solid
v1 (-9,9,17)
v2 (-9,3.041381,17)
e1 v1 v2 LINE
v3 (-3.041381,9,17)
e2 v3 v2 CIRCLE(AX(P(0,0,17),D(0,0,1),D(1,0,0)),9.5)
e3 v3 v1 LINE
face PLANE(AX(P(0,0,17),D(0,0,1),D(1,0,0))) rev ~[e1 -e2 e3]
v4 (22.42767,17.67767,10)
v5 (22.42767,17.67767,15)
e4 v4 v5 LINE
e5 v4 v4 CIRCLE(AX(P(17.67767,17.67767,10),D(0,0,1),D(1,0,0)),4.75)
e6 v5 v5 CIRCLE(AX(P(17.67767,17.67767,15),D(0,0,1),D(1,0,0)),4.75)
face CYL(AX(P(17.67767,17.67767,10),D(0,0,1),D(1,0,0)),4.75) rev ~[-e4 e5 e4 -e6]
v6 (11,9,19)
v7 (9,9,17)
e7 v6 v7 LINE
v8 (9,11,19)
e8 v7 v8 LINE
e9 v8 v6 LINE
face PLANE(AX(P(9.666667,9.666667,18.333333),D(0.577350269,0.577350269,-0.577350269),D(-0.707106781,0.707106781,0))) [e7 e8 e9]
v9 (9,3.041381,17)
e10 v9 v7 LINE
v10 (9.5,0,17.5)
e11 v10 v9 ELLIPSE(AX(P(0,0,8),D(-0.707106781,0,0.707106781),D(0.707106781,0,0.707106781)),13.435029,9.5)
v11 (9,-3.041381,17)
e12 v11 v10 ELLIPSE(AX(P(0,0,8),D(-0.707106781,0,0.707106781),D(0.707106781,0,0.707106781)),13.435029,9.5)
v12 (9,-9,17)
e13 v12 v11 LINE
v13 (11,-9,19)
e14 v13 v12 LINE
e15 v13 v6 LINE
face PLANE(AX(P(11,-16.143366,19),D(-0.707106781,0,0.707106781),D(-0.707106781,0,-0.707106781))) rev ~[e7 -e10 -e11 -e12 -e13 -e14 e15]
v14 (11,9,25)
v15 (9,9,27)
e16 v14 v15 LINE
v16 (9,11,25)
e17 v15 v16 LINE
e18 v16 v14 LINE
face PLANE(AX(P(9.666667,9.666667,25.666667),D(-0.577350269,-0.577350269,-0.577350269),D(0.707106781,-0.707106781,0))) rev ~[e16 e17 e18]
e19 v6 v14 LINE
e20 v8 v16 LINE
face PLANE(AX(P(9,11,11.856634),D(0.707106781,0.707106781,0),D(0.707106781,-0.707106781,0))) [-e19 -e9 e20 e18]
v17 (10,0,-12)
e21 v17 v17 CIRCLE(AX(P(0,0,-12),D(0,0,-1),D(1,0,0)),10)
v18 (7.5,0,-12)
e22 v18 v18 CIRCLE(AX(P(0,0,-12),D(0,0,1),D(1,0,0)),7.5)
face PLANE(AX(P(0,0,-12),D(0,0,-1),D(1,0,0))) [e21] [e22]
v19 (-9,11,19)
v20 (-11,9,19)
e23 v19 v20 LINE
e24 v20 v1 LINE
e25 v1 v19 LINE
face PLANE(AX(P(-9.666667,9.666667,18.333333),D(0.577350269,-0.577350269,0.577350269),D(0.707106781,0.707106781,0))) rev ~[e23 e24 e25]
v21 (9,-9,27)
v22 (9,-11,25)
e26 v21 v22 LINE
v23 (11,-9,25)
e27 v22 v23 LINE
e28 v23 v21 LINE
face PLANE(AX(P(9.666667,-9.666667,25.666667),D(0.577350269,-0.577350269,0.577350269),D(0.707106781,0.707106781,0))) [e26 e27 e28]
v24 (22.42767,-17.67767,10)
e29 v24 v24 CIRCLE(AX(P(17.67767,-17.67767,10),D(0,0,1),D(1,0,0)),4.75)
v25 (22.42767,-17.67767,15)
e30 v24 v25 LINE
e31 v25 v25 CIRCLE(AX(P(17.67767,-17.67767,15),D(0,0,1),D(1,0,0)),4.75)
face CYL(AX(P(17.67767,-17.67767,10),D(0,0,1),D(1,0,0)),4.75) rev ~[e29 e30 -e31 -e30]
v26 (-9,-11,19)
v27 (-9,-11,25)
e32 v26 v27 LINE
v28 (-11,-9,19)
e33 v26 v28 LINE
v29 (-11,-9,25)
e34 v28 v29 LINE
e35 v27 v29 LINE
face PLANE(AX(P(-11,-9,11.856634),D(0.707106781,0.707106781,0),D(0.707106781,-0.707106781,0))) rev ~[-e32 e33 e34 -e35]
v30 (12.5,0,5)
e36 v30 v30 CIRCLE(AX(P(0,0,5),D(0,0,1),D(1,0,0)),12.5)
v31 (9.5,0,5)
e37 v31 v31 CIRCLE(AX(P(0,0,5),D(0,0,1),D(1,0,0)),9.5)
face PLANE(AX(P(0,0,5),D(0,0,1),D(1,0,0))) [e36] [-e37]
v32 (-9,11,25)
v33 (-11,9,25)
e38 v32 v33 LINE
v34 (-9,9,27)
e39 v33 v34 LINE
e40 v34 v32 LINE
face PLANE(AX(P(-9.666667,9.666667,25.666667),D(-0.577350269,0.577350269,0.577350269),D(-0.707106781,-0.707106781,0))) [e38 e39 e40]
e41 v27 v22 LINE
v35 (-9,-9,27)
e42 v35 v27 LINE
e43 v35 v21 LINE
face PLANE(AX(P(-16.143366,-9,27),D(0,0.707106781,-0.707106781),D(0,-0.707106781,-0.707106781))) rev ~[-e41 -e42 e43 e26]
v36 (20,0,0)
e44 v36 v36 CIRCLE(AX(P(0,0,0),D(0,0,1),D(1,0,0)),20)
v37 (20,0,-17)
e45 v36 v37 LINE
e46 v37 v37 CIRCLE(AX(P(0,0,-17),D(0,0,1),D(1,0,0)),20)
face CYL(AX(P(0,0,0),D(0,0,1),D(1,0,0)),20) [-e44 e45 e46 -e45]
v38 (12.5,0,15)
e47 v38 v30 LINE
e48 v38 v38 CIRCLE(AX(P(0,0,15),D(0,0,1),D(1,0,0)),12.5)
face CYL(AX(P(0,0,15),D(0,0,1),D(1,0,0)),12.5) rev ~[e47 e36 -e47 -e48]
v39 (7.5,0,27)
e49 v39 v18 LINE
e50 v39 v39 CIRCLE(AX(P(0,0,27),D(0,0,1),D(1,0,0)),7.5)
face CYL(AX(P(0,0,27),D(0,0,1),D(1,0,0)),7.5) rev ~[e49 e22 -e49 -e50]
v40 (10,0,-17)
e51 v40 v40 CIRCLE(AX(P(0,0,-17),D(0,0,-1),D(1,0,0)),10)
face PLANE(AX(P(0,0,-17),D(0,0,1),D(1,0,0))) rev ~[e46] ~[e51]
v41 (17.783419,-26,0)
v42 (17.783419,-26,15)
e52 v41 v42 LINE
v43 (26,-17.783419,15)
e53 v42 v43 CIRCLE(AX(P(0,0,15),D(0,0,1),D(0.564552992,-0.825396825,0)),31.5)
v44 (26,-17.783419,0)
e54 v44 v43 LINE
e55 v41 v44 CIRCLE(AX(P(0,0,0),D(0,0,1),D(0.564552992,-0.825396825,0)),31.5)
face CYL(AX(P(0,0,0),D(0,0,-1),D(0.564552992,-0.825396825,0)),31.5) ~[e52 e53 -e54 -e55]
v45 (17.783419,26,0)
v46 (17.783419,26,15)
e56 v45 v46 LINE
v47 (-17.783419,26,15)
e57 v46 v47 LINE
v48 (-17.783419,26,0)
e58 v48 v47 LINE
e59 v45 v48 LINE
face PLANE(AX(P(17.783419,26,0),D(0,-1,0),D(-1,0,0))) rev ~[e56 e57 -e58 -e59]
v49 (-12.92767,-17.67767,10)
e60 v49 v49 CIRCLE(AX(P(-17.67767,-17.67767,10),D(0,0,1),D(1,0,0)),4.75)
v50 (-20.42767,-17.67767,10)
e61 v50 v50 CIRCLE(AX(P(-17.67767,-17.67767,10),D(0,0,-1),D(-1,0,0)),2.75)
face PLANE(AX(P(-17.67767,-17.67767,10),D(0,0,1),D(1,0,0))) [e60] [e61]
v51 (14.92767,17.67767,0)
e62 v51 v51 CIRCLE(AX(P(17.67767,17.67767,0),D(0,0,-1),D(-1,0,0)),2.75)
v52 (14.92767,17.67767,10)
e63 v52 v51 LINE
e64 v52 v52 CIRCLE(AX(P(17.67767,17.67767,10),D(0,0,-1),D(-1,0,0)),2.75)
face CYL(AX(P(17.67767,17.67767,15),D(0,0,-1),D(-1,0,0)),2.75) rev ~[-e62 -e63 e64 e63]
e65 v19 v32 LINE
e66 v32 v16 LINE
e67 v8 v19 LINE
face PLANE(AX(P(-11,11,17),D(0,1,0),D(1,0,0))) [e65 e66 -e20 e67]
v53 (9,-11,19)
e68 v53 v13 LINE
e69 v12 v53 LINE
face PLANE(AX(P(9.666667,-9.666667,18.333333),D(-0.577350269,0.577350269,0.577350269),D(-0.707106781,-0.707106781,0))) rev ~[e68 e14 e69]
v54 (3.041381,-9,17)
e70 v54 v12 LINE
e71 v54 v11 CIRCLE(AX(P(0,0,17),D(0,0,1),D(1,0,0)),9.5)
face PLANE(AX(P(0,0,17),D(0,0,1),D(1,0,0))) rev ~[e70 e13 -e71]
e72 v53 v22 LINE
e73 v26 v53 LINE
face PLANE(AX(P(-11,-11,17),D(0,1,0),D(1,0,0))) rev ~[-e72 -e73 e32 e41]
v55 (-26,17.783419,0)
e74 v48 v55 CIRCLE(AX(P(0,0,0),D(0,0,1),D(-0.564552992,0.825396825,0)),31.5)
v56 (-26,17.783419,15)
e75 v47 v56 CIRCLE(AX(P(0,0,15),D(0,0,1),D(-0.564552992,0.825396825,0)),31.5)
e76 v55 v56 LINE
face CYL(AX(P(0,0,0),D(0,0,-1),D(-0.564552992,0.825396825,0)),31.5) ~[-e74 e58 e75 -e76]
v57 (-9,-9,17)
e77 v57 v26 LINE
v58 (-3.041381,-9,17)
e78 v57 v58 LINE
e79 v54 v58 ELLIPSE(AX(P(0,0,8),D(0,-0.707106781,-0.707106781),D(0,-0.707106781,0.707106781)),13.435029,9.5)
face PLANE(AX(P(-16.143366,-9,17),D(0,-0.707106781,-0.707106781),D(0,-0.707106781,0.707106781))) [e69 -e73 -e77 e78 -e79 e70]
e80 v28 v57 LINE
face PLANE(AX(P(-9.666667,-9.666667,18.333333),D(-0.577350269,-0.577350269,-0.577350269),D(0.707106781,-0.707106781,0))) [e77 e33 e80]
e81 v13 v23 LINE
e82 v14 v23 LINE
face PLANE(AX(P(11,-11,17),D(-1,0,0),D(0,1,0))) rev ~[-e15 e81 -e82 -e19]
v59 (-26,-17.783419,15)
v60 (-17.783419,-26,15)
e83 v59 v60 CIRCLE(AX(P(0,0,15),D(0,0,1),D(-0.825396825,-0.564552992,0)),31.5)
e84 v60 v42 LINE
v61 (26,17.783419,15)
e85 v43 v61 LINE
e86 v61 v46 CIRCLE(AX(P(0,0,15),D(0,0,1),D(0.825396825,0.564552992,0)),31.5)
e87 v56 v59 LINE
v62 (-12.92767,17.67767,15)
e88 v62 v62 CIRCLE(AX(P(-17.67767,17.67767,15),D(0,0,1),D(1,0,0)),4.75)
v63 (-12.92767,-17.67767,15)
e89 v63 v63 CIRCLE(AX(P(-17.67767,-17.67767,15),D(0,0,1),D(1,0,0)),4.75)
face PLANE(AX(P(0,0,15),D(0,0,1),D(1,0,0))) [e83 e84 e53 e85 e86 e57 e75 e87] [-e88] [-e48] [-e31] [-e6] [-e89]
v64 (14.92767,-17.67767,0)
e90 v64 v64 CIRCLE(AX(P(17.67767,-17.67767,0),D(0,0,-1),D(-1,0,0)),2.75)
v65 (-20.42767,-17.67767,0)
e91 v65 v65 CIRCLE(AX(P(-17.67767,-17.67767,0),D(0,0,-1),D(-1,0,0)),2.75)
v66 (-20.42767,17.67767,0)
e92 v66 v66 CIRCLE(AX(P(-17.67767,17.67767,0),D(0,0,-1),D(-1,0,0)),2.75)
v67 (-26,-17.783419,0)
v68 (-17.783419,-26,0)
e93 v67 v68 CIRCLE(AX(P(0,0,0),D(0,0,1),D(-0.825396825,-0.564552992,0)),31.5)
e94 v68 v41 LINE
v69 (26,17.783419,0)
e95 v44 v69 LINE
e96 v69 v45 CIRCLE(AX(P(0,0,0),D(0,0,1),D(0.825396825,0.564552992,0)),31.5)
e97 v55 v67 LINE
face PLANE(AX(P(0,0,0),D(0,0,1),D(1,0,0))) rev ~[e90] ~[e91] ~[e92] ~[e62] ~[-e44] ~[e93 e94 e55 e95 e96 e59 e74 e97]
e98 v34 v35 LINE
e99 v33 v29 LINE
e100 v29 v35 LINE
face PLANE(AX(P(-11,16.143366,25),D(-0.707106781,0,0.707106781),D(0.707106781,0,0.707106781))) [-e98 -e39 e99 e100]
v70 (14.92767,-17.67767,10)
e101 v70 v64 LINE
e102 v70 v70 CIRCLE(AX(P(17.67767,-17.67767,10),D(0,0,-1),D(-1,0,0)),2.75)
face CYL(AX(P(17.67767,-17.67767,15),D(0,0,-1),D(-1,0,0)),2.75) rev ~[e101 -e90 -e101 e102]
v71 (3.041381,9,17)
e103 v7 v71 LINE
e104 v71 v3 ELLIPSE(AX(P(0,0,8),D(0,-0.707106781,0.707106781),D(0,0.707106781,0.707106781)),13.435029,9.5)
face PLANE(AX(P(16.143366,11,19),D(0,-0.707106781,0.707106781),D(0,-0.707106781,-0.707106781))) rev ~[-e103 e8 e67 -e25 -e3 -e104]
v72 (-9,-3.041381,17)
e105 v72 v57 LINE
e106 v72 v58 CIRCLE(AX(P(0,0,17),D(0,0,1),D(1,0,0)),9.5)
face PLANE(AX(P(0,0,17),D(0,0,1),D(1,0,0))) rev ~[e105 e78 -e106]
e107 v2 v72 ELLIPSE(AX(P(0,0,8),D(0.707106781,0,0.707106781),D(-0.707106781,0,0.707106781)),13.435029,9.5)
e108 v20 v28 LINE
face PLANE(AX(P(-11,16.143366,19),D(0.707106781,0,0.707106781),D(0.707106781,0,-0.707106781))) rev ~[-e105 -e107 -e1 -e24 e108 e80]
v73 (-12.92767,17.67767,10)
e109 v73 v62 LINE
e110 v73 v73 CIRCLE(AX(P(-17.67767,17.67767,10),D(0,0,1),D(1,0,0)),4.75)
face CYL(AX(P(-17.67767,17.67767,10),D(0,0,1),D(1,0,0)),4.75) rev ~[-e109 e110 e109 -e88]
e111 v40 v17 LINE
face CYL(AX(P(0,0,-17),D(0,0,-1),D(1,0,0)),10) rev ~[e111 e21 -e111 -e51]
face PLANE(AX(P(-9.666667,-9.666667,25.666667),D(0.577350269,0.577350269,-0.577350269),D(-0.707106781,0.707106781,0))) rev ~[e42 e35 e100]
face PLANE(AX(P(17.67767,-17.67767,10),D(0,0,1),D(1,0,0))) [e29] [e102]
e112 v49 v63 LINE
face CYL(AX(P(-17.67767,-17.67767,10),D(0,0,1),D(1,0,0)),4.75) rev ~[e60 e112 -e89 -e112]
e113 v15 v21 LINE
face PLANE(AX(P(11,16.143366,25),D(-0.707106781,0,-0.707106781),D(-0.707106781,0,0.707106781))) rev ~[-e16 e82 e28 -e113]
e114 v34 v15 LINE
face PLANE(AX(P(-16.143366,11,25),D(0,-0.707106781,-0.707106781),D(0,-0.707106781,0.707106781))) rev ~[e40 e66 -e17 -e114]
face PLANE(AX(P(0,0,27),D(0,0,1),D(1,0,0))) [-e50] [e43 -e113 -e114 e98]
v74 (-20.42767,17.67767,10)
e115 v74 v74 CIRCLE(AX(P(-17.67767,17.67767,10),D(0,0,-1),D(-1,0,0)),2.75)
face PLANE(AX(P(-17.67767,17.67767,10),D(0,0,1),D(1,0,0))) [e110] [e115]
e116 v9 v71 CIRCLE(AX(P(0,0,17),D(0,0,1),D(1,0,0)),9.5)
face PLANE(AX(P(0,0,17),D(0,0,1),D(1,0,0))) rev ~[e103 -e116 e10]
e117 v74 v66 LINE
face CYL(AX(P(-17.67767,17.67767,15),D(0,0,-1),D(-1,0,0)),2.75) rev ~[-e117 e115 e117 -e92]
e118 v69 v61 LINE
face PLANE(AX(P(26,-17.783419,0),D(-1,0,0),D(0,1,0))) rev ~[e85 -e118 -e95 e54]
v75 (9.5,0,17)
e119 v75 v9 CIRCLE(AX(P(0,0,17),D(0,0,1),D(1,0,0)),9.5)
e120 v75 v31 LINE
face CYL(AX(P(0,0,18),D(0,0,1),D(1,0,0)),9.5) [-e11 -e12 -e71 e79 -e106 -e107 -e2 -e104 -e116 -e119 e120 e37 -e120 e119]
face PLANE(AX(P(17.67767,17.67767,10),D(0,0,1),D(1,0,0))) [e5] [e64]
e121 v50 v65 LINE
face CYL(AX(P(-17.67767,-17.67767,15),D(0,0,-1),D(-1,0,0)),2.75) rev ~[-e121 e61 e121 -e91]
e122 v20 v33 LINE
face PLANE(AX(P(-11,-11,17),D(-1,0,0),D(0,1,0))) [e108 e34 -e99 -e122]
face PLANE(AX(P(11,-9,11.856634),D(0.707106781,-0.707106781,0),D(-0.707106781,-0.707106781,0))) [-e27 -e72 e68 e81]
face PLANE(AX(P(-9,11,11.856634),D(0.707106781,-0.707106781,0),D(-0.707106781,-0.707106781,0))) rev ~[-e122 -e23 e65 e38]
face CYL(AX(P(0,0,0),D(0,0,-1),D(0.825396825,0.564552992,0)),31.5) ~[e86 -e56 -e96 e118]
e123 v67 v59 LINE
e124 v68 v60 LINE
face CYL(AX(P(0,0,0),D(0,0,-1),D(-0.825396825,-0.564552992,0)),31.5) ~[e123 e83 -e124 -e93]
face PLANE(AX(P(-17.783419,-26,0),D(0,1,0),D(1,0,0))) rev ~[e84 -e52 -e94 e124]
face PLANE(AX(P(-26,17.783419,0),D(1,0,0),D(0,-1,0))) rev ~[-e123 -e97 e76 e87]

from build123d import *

# Parameters (mm, degrees)
F0_R            = 20
F1_DEPTH        = 17
F3_DEPTH        = 15
F4_R            = 12.5
F4_R_2          = 9.5
F5_DEPTH        = 10
F6_R            = 9.5
F7_DEPTH        = 2
F8_W            = 22
F8_H            = 22
F9_DEPTH        = 10
F10_T1_DEPTH    = 2.5403411844
F10_T3_DEPTH    = 2.5403411844
F10_T5_DEPTH    = 2.5403411844
F10_T7_DEPTH    = 2.5403411844
F10_T9_DEPTH    = 2.5403411844
F10_T11_DEPTH   = 2.5403411844
F10_T13_DEPTH   = 2.5403411844
F10_T15_DEPTH   = 2.5403411844
F10_T17_DEPTH   = 32.2867319519
F10_T19_DEPTH   = 32.2867319519
F10_T24_DEPTH   = 20.2867319519
F10_T29_DEPTH   = 20.2867319519
F10_T34_DEPTH   = 20.2867319519
F10_T39_DEPTH   = 20.2867319519
F10_T44_DEPTH   = 32.2867319519
F10_S45_R       = 9.5
F10_T46_DEPTH   = 18
F10_T50_DEPTH   = 32.2867319519
F10_S51_R       = 9.5
F10_T52_DEPTH   = 18
F10_T56_DEPTH   = 32.2867319519
F10_S57_R       = 9.5
F10_T58_DEPTH   = 18
F10_T62_DEPTH   = 32.2867319519
F10_S63_R       = 9.5
F10_T64_DEPTH   = 18
F11_R           = 10
F12_DEPTH       = 5
F13_R           = 7.5
F14_DEPTH       = 44.001
F16_D           = 5.5
F16_CBORE_D     = 9.5
F16_CBORE_DEPTH = 5


# Not quite as in the source:
# - a fillet or chamfer that OpenCascade refuses, or shapes differently, is made with other operations: its cross-section is extruded or revolved along the edge and cut away or added


with BuildPart() as f1:
    # F0 (on Top) → F1 (new body)
    with BuildSketch(Plane.XY):
        Circle(F0_R)
    extrude(amount=-F1_DEPTH)

    # F2 (on Top) → F3 (join)
    with BuildSketch(Plane.XY):
        with BuildLine():
            Line((17.7834192438, 26), (-17.7834192438, 26))
            ThreePointArc((-17.7834192438, 26), (-22.2738636074, 22.2738636074), (-26, 17.7834192438))
            Line((-26, 17.7834192438), (-26, -17.7834192438))
            ThreePointArc((-26, -17.7834192438), (-22.2738636074, -22.2738636074), (-17.7834192438, -26))
            Line((-17.7834192438, -26), (17.7834192438, -26))
            ThreePointArc((17.7834192438, -26), (22.2738636074, -22.2738636074), (26, -17.7834192438))
            Line((26, -17.7834192438), (26, 17.7834192438))
            ThreePointArc((26, 17.7834192438), (22.2738636074, 22.2738636074), (17.7834192438, 26))
        make_face()
    extrude(amount=F3_DEPTH)

    # F4 (on face) → F5 (cut)
    with BuildSketch(Plane.XY.offset(15)):
        Circle(F4_R)
        Circle(F4_R_2, mode=Mode.SUBTRACT)
    extrude(amount=-F5_DEPTH, mode=Mode.SUBTRACT)

    # F6 (on face) → F7 (join)
    with BuildSketch(Plane.XY.offset(15)):
        Circle(F6_R)
    extrude(amount=F7_DEPTH)

    # F8 (on face) → F9 (join)
    with BuildSketch(Plane.XY.offset(17)):
        Rectangle(F8_W, F8_H)
    extrude(amount=F9_DEPTH)

    # F10: chamfer of 2 on 12 edges, made by hand

    # F10_s2 → F10_t1 (cut)
    with BuildSketch(Plane(origin=(-0.3333333333, 0.3333333333, -0.3333333333), x_dir=(-0.7071067812, -0.7071067812, 0), z_dir=(-0.5773502692, 0.5773502692, -0.5773502692))):
        Polygon((-1.4142135624, 23.6784008469), (1.4142135624, 23.6784008469), (0, 21.2289111041), align=None)
    extrude(amount=F10_T1_DEPTH, mode=Mode.SUBTRACT)

    # F10_s4 → F10_t3 (cut)
    with BuildSketch(Plane(origin=(-15, 15, 15), x_dir=(-0.7071067812, -0.7071067812, 0), z_dir=(-0.5773502692, 0.5773502692, 0.5773502692))):
        Polygon((-1.4142135624, 12.2474487139), (1.4142135624, 12.2474487139), (0, 14.6969384567), align=None)
    extrude(amount=F10_T3_DEPTH, mode=Mode.SUBTRACT)

    # F10_s6 → F10_t5 (cut)
    with BuildSketch(Plane(origin=(0.3333333333, 0.3333333333, -0.3333333333), x_dir=(-0.7071067812, 0.7071067812, 0), z_dir=(0.5773502692, 0.5773502692, -0.5773502692))):
        Polygon((1.4142135624, 23.6784008469), (-1.4142135624, 23.6784008469), (0, 21.2289111041), align=None)
    extrude(amount=F10_T5_DEPTH, mode=Mode.SUBTRACT)

    # F10_s8 → F10_t7 (cut)
    with BuildSketch(Plane(origin=(15, 15, 15), x_dir=(-0.7071067812, 0.7071067812, 0), z_dir=(0.5773502692, 0.5773502692, 0.5773502692))):
        Polygon((1.4142135624, 12.2474487139), (-1.4142135624, 12.2474487139), (0, 14.6969384567), align=None)
    extrude(amount=F10_T7_DEPTH, mode=Mode.SUBTRACT)

    # F10_s10 → F10_t9 (cut)
    with BuildSketch(Plane(origin=(0.3333333333, -0.3333333333, -0.3333333333), x_dir=(0.7071067812, 0.7071067812, 0), z_dir=(0.5773502692, -0.5773502692, -0.5773502692))):
        Polygon((1.4142135624, 23.6784008469), (0, 21.2289111041), (-1.4142135624, 23.6784008469), align=None)
    extrude(amount=F10_T9_DEPTH, mode=Mode.SUBTRACT)

    # F10_s12 → F10_t11 (cut)
    with BuildSketch(Plane(origin=(15, -15, 15), x_dir=(0.7071067812, 0.7071067812, 0), z_dir=(0.5773502692, -0.5773502692, 0.5773502692))):
        Polygon((1.4142135624, 12.2474487139), (0, 14.6969384567), (-1.4142135624, 12.2474487139), align=None)
    extrude(amount=F10_T11_DEPTH, mode=Mode.SUBTRACT)

    # F10_s14 → F10_t13 (cut)
    with BuildSketch(Plane(origin=(-0.3333333333, -0.3333333333, -0.3333333333), x_dir=(0.7071067812, -0.7071067812, 0), z_dir=(-0.5773502692, -0.5773502692, -0.5773502692))):
        Polygon((-1.4142135624, 23.6784008469), (0, 21.2289111041), (1.4142135624, 23.6784008469), align=None)
    extrude(amount=F10_T13_DEPTH, mode=Mode.SUBTRACT)

    # F10_s16 → F10_t15 (cut)
    with BuildSketch(Plane(origin=(-15, -15, 15), x_dir=(0.7071067812, -0.7071067812, 0), z_dir=(-0.5773502692, -0.5773502692, 0.5773502692))):
        Polygon((-1.4142135624, 12.2474487139), (0, 14.6969384567), (1.4142135624, 12.2474487139), align=None)
    extrude(amount=F10_T15_DEPTH, mode=Mode.SUBTRACT)

    # F10_s18 → F10_t17 (cut)
    with BuildSketch(Plane.XZ.offset(-16.1433659759)):
        Polygon((-11, 25), (-9, 27), (-11, 27), align=None)
        Polygon((11, 25), (9, 27), (11, 27), align=None)
    extrude(amount=F10_T17_DEPTH, mode=Mode.SUBTRACT)

    # F10_s20 → F10_t19 (cut)
    with BuildSketch(Plane.YZ.offset(-16.1433659759)):
        Polygon((-9, 27), (-11, 25), (-11, 27), align=None)
        Polygon((11, 25), (9, 27), (11, 27), align=None)
    extrude(amount=F10_T19_DEPTH, mode=Mode.SUBTRACT)


with BuildPart() as f10_tool22:
    # F10_s23 → F10_t24 (new body)
    with BuildSketch(Plane.XY.offset(11.8566340241)):
        Polygon((-9, 11), (-11, 9), (-11, 11), align=None)
    extrude(amount=F10_T24_DEPTH)

    split(bisect_by=Plane.XY.offset(15), keep=Keep.TOP)


with BuildPart() as f1_1:
    add(f1.part)

    # F10_t21: cut F10_tool22
    add(f10_tool22.part, mode=Mode.SUBTRACT)


with BuildPart() as f10_tool27:
    # F10_s28 → F10_t29 (new body)
    with BuildSketch(Plane.XY.offset(11.8566340241)):
        Polygon((9, 11), (11, 9), (11, 11), align=None)
    extrude(amount=F10_T29_DEPTH)

    split(bisect_by=Plane.XY.offset(15), keep=Keep.TOP)


with BuildPart() as f1_2:
    add(f1_1.part)

    # F10_t26: cut F10_tool27
    add(f10_tool27.part, mode=Mode.SUBTRACT)


with BuildPart() as f10_tool32:
    # F10_s33 → F10_t34 (new body)
    with BuildSketch(Plane.XY.offset(11.8566340241)):
        Polygon((11, -9), (9, -11), (11, -11), align=None)
    extrude(amount=F10_T34_DEPTH)

    split(bisect_by=Plane.XY.offset(15), keep=Keep.TOP)


with BuildPart() as f1_3:
    add(f1_2.part)

    # F10_t31: cut F10_tool32
    add(f10_tool32.part, mode=Mode.SUBTRACT)


with BuildPart() as f10_tool37:
    # F10_s38 → F10_t39 (new body)
    with BuildSketch(Plane.XY.offset(11.8566340241)):
        Polygon((-11, -9), (-9, -11), (-11, -11), align=None)
    extrude(amount=F10_T39_DEPTH)

    split(bisect_by=Plane.XY.offset(15), keep=Keep.TOP)


with BuildPart() as f1_4:
    add(f1_3.part)

    # F10_t36: cut F10_tool37
    add(f10_tool37.part, mode=Mode.SUBTRACT)


with BuildPart() as f10_tool42:
    # F10_s43 → F10_t44 (new body)
    with BuildSketch(Plane.XZ.offset(-16.1433659759)):
        Polygon((-11, 19), (-9, 17), (-11, 17), align=None)
    extrude(amount=F10_T44_DEPTH)

    # F10_s45 → F10_t46 (cut, symmetric)
    with BuildSketch(Plane.XY.offset(18)):
        Circle(F10_S45_R)
    extrude(amount=F10_T46_DEPTH, both=True, mode=Mode.SUBTRACT)


with BuildPart() as f1_5:
    add(f1_4.part)

    # F10_t41: cut F10_tool42
    add(f10_tool42.part, mode=Mode.SUBTRACT)


with BuildPart() as f10_tool48:
    # F10_s49 → F10_t50 (new body)
    with BuildSketch(Plane.XZ.offset(16.1433659759)):
        Polygon((11, 19), (9, 17), (11, 17), align=None)
    extrude(amount=-F10_T50_DEPTH)

    # F10_s51 → F10_t52 (cut, symmetric)
    with BuildSketch(Plane.XY.offset(18)):
        Circle(F10_S51_R)
    extrude(amount=F10_T52_DEPTH, both=True, mode=Mode.SUBTRACT)


with BuildPart() as f1_6:
    add(f1_5.part)

    # F10_t47: cut F10_tool48
    add(f10_tool48.part, mode=Mode.SUBTRACT)


with BuildPart() as f10_tool54:
    # F10_s55 → F10_t56 (new body)
    with BuildSketch(Plane.YZ.offset(-16.1433659759)):
        Polygon((-9, 17), (-11, 19), (-11, 17), align=None)
    extrude(amount=F10_T56_DEPTH)

    # F10_s57 → F10_t58 (cut, symmetric)
    with BuildSketch(Plane.XY.offset(18)):
        Circle(F10_S57_R)
    extrude(amount=F10_T58_DEPTH, both=True, mode=Mode.SUBTRACT)


with BuildPart() as f1_7:
    add(f1_6.part)

    # F10_t53: cut F10_tool54
    add(f10_tool54.part, mode=Mode.SUBTRACT)


with BuildPart() as f10_tool60:
    # F10_s61 → F10_t62 (new body)
    with BuildSketch(Plane.YZ.offset(16.1433659759)):
        Polygon((11, 19), (9, 17), (11, 17), align=None)
    extrude(amount=-F10_T62_DEPTH)

    # F10_s63 → F10_t64 (cut, symmetric)
    with BuildSketch(Plane.XY.offset(18)):
        Circle(F10_S63_R)
    extrude(amount=F10_T64_DEPTH, both=True, mode=Mode.SUBTRACT)


with BuildPart() as f1_8:
    add(f1_7.part)

    # F10_t59: cut F10_tool60
    add(f10_tool60.part, mode=Mode.SUBTRACT)

    # F11 (on face) → F12 (cut)
    with BuildSketch(Plane(origin=(0, 0, -17), x_dir=(1, 0, 0), z_dir=(0, 0, -1))):
        Circle(F11_R)
    extrude(amount=-F12_DEPTH, mode=Mode.SUBTRACT)

    # F13 (on face) → F14 (cut, through all)
    with BuildSketch(Plane.XY.offset(27)):
        Circle(F13_R)
    extrude(amount=-F14_DEPTH, mode=Mode.SUBTRACT)

    # F16 (through all)
    with Locations(Plane.XY.offset(15)):
        with Locations((17.6776695297, 17.6776695297), (17.6776695297, -17.6776695297), (-17.6776695297, -17.6776695297), (-17.6776695297, 17.6776695297)):
            CounterBoreHole(F16_D / 2, F16_CBORE_D / 2, F16_CBORE_DEPTH)


solid = f1_8.part
